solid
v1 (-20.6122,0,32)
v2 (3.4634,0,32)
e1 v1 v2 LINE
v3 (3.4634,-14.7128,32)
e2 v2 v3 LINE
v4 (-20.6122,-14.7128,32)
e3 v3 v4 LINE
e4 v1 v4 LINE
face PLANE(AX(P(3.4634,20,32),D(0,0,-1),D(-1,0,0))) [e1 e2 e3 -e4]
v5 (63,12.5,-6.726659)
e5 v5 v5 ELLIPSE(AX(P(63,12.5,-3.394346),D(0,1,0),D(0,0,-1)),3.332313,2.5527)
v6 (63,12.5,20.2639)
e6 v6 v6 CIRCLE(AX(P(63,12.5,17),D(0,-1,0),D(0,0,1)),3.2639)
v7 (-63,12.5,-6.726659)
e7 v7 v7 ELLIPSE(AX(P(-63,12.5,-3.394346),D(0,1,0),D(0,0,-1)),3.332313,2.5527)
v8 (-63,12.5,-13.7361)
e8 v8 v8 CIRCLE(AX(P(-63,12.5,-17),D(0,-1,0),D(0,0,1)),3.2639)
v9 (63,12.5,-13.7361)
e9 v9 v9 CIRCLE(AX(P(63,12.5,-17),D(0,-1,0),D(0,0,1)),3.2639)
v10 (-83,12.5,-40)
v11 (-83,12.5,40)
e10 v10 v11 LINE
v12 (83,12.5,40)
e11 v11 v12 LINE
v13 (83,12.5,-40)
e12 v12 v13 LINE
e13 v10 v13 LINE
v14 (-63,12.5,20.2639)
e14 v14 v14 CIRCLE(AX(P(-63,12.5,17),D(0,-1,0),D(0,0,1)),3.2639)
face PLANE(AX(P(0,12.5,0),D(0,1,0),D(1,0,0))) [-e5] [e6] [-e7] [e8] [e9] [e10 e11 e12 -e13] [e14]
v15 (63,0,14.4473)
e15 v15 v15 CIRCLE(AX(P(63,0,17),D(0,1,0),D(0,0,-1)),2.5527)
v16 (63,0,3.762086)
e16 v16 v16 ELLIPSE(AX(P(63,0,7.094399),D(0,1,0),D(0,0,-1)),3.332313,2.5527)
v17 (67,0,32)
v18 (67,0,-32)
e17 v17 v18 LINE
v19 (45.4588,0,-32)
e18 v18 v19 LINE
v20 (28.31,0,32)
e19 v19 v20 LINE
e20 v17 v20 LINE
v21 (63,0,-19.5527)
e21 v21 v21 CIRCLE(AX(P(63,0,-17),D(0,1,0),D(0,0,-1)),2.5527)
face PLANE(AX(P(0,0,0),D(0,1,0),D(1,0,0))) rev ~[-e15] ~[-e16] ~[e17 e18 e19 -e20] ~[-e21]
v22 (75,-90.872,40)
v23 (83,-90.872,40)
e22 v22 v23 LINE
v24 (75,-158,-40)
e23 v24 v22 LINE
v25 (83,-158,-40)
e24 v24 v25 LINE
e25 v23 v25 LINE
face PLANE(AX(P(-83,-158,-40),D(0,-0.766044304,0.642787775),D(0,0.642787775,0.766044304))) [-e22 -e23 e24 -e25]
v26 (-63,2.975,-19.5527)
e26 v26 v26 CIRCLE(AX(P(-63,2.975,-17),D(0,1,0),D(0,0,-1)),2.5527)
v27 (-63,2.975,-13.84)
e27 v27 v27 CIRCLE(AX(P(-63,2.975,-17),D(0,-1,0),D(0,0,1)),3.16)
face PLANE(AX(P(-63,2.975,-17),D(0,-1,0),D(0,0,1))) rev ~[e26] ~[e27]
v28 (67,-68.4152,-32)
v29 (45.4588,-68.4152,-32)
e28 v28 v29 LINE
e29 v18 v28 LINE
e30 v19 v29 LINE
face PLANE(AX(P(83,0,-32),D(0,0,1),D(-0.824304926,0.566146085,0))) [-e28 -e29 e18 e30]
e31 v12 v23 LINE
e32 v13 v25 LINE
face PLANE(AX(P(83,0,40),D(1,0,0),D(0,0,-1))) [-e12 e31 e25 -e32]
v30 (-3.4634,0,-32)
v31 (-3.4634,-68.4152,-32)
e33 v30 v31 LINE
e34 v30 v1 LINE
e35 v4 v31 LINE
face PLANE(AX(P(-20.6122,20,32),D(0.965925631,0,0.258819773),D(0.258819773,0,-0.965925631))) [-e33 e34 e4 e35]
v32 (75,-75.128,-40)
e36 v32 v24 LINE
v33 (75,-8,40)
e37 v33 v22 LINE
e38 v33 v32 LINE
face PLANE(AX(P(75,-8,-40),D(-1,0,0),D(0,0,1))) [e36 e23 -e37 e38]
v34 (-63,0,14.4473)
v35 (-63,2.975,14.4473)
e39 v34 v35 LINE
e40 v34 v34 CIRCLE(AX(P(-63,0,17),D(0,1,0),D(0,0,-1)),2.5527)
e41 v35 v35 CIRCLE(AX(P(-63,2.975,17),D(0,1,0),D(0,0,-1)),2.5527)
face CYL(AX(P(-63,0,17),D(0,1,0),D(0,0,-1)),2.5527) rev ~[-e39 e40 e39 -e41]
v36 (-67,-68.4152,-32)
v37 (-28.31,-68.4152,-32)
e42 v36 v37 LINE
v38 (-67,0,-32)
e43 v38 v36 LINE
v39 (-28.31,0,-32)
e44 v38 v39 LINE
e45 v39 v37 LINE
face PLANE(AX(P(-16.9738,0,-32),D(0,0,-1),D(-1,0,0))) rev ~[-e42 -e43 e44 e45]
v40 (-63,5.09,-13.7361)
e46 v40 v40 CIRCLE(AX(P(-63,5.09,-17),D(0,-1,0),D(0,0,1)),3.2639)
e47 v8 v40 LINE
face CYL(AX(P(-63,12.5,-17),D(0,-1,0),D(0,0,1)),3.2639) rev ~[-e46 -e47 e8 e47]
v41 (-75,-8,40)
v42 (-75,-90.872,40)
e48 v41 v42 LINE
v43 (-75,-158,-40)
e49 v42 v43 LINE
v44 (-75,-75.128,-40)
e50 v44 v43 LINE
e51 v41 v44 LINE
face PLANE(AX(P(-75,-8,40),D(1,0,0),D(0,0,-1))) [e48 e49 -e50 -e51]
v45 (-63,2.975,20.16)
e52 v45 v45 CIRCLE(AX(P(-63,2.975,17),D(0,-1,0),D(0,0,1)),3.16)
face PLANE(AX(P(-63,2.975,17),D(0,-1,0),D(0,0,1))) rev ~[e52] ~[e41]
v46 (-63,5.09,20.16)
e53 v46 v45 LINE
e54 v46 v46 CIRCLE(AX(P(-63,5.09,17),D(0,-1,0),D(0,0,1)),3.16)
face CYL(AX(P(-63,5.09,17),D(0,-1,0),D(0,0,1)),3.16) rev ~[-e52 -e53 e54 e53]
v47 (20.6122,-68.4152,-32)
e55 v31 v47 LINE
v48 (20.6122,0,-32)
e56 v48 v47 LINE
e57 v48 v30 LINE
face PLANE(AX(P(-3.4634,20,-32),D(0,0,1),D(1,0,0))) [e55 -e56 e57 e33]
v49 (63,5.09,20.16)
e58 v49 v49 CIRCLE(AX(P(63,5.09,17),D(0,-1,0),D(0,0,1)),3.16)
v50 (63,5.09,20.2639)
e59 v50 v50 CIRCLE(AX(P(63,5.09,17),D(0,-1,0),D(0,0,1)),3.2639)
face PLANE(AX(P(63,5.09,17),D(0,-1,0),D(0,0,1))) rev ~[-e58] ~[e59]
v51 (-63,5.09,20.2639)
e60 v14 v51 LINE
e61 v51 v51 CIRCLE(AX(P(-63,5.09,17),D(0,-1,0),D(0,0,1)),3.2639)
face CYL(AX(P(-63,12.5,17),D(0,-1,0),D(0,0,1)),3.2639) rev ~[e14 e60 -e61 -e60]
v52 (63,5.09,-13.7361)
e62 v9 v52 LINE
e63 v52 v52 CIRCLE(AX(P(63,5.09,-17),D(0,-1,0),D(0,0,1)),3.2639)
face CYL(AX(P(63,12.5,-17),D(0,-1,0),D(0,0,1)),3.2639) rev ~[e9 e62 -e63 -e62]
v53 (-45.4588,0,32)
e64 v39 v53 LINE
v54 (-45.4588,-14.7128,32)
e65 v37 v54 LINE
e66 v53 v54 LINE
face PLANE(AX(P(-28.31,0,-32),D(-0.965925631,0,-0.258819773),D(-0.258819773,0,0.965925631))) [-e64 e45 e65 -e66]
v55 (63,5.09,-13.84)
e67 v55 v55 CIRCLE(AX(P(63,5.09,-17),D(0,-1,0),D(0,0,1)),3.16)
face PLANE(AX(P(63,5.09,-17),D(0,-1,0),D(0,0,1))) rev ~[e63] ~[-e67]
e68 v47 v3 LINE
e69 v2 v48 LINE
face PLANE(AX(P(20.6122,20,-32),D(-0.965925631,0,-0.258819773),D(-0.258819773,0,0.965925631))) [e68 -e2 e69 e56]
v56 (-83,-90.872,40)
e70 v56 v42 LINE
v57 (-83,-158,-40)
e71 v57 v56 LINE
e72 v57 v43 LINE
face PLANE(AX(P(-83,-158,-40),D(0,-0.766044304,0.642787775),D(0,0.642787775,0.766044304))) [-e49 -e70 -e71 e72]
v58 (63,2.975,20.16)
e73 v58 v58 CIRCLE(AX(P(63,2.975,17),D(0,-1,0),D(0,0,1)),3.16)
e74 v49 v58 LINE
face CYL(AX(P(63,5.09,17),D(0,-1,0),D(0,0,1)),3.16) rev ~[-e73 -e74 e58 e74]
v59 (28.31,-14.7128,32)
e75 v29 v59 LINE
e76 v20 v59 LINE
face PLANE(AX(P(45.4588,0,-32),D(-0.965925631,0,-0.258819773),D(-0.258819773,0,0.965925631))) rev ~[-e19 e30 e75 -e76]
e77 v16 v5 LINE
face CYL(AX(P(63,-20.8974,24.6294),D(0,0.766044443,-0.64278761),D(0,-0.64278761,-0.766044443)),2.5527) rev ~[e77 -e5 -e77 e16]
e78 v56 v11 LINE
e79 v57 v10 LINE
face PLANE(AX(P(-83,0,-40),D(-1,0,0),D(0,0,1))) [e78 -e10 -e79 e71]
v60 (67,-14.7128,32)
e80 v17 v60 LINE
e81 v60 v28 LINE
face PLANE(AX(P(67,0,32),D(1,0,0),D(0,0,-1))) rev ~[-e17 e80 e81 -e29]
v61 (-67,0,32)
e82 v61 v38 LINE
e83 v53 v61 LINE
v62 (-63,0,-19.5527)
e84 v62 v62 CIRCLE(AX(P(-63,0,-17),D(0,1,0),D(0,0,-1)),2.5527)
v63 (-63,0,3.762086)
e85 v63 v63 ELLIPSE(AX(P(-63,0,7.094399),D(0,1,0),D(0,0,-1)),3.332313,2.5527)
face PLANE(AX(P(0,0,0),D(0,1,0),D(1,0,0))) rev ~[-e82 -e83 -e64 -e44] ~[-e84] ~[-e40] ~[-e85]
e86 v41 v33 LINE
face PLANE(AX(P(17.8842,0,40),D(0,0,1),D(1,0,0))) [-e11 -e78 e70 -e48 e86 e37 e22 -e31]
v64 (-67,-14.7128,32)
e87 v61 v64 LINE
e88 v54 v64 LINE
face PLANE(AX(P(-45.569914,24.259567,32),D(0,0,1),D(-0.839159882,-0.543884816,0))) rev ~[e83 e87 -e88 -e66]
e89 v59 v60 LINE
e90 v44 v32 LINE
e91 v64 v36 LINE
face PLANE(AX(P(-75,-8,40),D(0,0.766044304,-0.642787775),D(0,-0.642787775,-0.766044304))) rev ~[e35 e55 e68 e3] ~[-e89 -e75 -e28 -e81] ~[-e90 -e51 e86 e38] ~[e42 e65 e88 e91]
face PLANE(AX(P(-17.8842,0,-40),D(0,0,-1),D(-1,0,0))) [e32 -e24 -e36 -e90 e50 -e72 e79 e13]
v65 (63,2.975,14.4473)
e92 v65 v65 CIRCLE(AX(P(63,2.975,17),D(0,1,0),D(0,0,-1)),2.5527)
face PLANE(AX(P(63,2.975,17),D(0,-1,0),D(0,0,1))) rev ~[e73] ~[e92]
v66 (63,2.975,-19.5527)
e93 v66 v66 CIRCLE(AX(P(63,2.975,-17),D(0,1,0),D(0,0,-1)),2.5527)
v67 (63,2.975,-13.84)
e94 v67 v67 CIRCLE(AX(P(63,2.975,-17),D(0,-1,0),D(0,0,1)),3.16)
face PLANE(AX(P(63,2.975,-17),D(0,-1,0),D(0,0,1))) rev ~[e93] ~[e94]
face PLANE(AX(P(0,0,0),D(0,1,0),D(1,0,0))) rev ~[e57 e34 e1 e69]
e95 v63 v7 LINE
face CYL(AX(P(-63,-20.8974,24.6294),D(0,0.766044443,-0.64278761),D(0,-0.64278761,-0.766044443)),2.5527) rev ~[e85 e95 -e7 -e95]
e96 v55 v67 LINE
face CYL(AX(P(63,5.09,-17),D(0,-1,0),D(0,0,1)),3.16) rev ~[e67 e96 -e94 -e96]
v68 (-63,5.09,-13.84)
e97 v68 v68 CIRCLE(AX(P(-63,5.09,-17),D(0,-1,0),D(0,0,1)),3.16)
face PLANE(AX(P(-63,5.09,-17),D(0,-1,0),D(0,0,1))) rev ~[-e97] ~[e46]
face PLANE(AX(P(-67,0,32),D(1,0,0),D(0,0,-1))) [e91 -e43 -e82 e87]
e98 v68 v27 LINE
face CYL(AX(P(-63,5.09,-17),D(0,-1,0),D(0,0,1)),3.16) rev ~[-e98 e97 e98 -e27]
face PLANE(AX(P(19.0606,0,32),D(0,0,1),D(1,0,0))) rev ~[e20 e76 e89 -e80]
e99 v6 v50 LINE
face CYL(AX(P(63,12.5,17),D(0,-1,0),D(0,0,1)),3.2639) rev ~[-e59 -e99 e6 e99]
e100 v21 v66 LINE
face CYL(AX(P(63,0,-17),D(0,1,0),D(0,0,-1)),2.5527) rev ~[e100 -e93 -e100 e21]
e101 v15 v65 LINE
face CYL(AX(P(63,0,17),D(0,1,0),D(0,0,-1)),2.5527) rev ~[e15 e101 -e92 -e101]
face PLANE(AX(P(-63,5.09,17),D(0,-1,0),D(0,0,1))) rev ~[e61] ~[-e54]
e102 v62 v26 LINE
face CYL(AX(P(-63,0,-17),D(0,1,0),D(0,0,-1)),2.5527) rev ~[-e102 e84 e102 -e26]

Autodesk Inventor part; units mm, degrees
ref_plane "XZ Plane" through (0, 0, 0) normal (0, 1, 0) x (-1, 0, 0)
ref_plane "XY Plane" through (0, 0, 0) normal (0, 0, 1) x (1, 0, 0)
sketch "Sketch8" plane through (0, 0, 0) normal (0, 1, 0) x (-1, 0, 0)
  line L0 (83, 40) -> (-83, 40)
  line L1 (-83, 40) -> (-83, -40)
  line L2 (-83, -40) -> (83, -40)
  line L3 (83, -40) -> (83, 40)
  line L4 (83, 40) -> (-83, -40) construction
  line L5 (-83, 40) -> (83, -40) construction
  point P0 (0, 0)
  dimension "d28" = 80
  dimension "d29" = 166
extrude "Extrusion8" add sketch "Sketch8" against normal blind 8
sketch "Sketch9" plane through (0, -8, 0) normal (0, -1, 0) x (1, 0, 0)
  line L0 (83, 40) -> (-83, 40) projected
  line L1 (-83, -40) -> (83, -40) projected
  line L2 (-83, 40) -> (-75, 40)
  line L3 (-75, 40) -> (-75, -40)
  line L4 (-75, -40) -> (-83, -40)
  line L5 (-83, -40) -> (-83, 40)
  line L6 (83, -40) -> (83, 40) projected
  line L7 (83, -40) -> (75, -40)
  line L8 (75, -40) -> (75, 40)
  line L9 (75, 40) -> (83, 40)
  line L10 (83, 40) -> (83, -40)
  point P0 (0, 0)
  point P1 (75, 40)
  point P2 (75, -40)
  dimension "d32" = 8
  dimension "d33" = 8
extrude "armsForCameraCase" add sketch "Sketch9" along normal blind 150 contours L6 L1 L8 L0 | L3 L1 L5 L0
sketch "Sketch10" plane through (-75, -8, 40) normal (1, 0, 0) x (0, 0, -1)
  line L0 (0, 0) -> (80, 0) projected
  line L1 (80, 0) -> (80, -150) projected
  line L2 (80, -150) -> (0, -150) projected
  line L3 (0, 0) -> (0, -150) projected
  line L4 (0, 0) -> (80, -67.128)
  line L5 (80, -67.128) -> (80, 0)
  line L6 (80, 0) -> (0, 0)
  point P0 (40, 8)
  point P1 (40, -33.564)
  dimension "d48" = 40
extrude "Extrusion10" add sketch "Sketch10" along normal up to surface (150 mm away) contours L0 L1 L4
sketch "Sketch11" plane through (0, 0, 0) normal (0, 1, 0) x (1, 0, 0)
  line L0 (83, 40) -> (-83, 40) projected
  line L1 (-83, -40) -> (83, -40) projected
  line L2 (-83, 40) -> (-83, -40) projected
  line L3 (83, -40) -> (83, 40) projected
  line L4 (-31.038, -40) -> (-9.602, 40)
  line L5 (-9.602, 40) -> (-17.8842, 40)
  line L6 (-75, 40) -> (75, 40) projected
  line L7 (-17.8842, 40) -> (-39.3202, -40)
  line L8 (-39.3202, -40) -> (-31.038, -40)
  line L9 (-31.038, -40) -> (-31.038, 40) construction
  line L10 (0, -40) -> (0, 40) construction
  line L11 (9.602, -40) -> (31.038, 40)
  line L12 (31.038, 40) -> (39.3202, 40)
  line L13 (39.3202, 40) -> (17.8842, -40)
  line L14 (17.8842, -40) -> (9.602, -40)
  point P0 (0, 0)
  point P1 (0, -40)
  point P2 (0, -40)
  point P3 (-20.32, 0)
  point P4 (0, 0)
  point P5 (20.32, 0)
  point P6 (39.3202, 40)
  point P7 (31.038, 40)
  point P8 (-17.8842, 40)
  dimension "d39" = -15
  dimension "d40" = 8
  dimension "d42" = 8
  dimension "d44" = 20.32
  dimension "d45" = 20.32
extrude "Extrusion11" add sketch "Sketch11" along normal blind 104.1375 contours L13 L1 L11 L0 | L4 L1 L7 L0
sketch "Sketch12" plane through (0, 0, 0) normal (0, 1, 0) x (1, 0, 0)
  line L0 (31.038, 40) -> (-9.602, 40) projected
  line L1 (31.038, 40) -> (9.602, -40) projected
  line L2 (-31.038, -40) -> (9.602, -40) projected
  line L3 (-31.038, -40) -> (-9.602, 40) projected
  line L4 (-9.602, 40) -> (31.038, 40)
  line L5 (31.038, 40) -> (9.602, -40)
  line L6 (9.602, -40) -> (-31.038, -40)
  line L7 (-9.602, 40) -> (-31.038, -40) projected
  line L8 (-31.038, -40) -> (-9.602, 40)
  point P0 (0, 0)
extrude "Extrusion12" add sketch "Sketch12" along normal blind 20
sketch "Sketch13" plane through (-83, 0, -40) normal (-1, 0, 0) x (0, 0, 1)
  line L0 (0, -75.128) -> (80, -8) projected
  line L1 (80, 0) -> (80, -158) projected
  line L2 (80, -158) -> (0, -158) projected
  line L3 (0, 0) -> (0, -158) projected
  line L4 (80, -158) -> (0, -158) construction
  line L5 (40, -158) -> (40, -41.564) construction
  line L6 (80, -8) -> (0, -75.128) construction
  line L7 (0, -205.6687) -> (80, -138.5407) construction
  line L8 (80, -8) -> (80, -158) construction
  point P0 (40, 0)
  point P1 (40, -172.1047)
  point P2 (20, -188.8867)
  point P3 (60, -155.3227)
  dimension "centerForTwoHoles" = 26.1081
  dimension "d51" = 100
  dimension "diagonalLine" = 104.4326
  dimension "d62" = 26.1081
  dimension "d63" = 26.1081
hole "HolesForAttchingToLowerCase" at (-83, -172.1047, 0) at (-83, -188.8867, -20) at (-83, -155.3227, 20) direction (1, 0, 0) diameter 6.7564 end through all clearance for "Hex Machine Screw" size "1/4" standard "Ansi Unified Screw Threads"
sketch "Sketch14" plane through (-83, 0, -40) normal (-1, 0, 0) x (0, 0, 1)
  line L0 (80, 0) -> (80, -158) projected
  line L1 (80, -158) -> (0, -158) projected
  line L2 (0, 0) -> (0, -158) projected
  line L3 (0, -75.128) -> (80, -8) projected
  line L4 (0, -75.128) -> (0, -158) projected
  line L5 (0, -158) -> (80, -90.872)
  line L6 (0, -158) -> (80, -158) projected
  line L7 (0, -158) -> (80, -158)
  line L8 (80, -158) -> (80, -90.872)
  point P0 (40, 0)
extrude "Extrusion13" cut sketch "Sketch14" against normal through all contours L0 L1 L5
sketch "Sketch15" plane through (-39.3202, 0, 40) normal (-0.9659258, 0, -0.258819) x (-0.258819, 0, 0.9659258)
  line L0 (-82.8221, 104.1375) -> (0, 104.1375) projected
  line L1 (0, 0) -> (0, 104.1375) projected
  line L2 (-82.8221, 0) -> (-82.8221, 104.1375) projected
  line L3 (-2.1436, 20) -> (-84.9657, 20) projected
  line L4 (-82.8221, 40) -> (0, 40) construction
  line L5 (-57.8221, 40) -> (-57.8221, 104.1375) construction
  point P0 (-48.8138, 0)
  point P1 (-82.8221, 52.0688)
  point P2 (-37.8221, 40)
  point P3 (-17.8221, 40)
  point P4 (-57.8221, 60)
  point P5 (-37.8221, 60)
  point P6 (-17.8221, 60)
  point P7 (-57.8221, 80)
  point P8 (-37.8221, 80)
  point P9 (-17.8221, 80)
  dimension "d64" = 25
  dimension "d74" = 20
  dimension "d77" = 20
  dimension "d90" = 20
hole "HoleForLeftSideOf2x4" at (-24.3547, 40, -15.8519) at (-29.5311, 40, 3.4667) at (-34.7075, 40, 22.7852) at (-29.5311, 60, 3.4667) at (-24.3547, 60, -15.8519) at (-34.7075, 60, 22.7852) at (-34.7075, 80, 22.7852) at (-29.5311, 80, 3.4667) at (-24.3547, 80, -15.8519) direction (0.9659258, 0, 0.258819) diameter 4.496 depth 8 countersink diameter 8.433 countersink angle 82 clearance for "Flat Head Machine Screw (82)" size "#8" standard "Ansi Unified Screw Threads"
sketch "Sketch16" plane through (39.3202, 0, -40) normal (0.9659258, 0, 0.258819) x (0.258819, 0, -0.9659258)
  line L0 (-82.8221, 104.1375) -> (0, 104.1375) projected
  line L1 (0, 0) -> (0, 104.1375) projected
  line L2 (-82.8221, 0) -> (-82.8221, 104.1375) projected
  line L3 (-82.8221, 0) -> (-65.9689, 0) projected
  line L4 (-2.1436, 20) -> (-84.9657, 20) projected
  line L5 (-82.8221, 40) -> (0, 40) construction
  line L6 (-67.8221, 40) -> (-67.8221, 104.1375) construction
  point P0 (-48.8138, 0)
  point P1 (-47.8221, 40)
  point P2 (-27.8221, 40)
  point P3 (-67.8221, 60)
  point P4 (-47.8221, 60)
  point P5 (-27.8221, 60)
  point P6 (-67.8221, 80)
  point P7 (-47.8221, 80)
  point P8 (-27.8221, 80)
  dimension "d80" = 20
  dimension "d81" = 15
  dimension "d84" = 20
  dimension "d87" = 20
hole "HolesForRightSideOf2x4" at (26.9429, 40, 6.1926) at (32.1193, 40, -13.1259) at (21.7665, 60, 25.5111) at (26.9429, 60, 6.1926) at (32.1193, 60, -13.1259) at (21.7665, 80, 25.5111) at (26.9429, 80, 6.1926) at (32.1193, 80, -13.1259) at (21.7665, 40, 25.5111) direction (-0.9659258, 0, -0.258819) diameter 4.496 depth 8 countersink diameter 8.433 countersink angle 82 clearance for "Flat Head Machine Screw (82)" size "#8" standard "Ansi Unified Screw Threads"
sketch "Sketch17" plane through (0, 20, 0) normal (0, 1, 0) x (1, 0, 0)
  line L0 (31.038, 40) -> (9.602, -40) projected
  line L1 (-31.038, -40) -> (9.602, -40) projected
  line L2 (-31.038, -40) -> (-9.602, 40) projected
  line L3 (31.038, 40) -> (-9.602, 40) projected
  line L4 (20.6122, 32) -> (3.4634, -32)
  line L5 (3.4634, -32) -> (-20.6122, -32)
  line L6 (-20.6122, -32) -> (-3.4634, 32)
  line L7 (-3.4634, 32) -> (20.6122, 32)
  point P0 (0, 0)
  point P1 (10.718, 40)
  point P2 (-8.5744, -32)
  dimension "d98" = 8
  dimension "d99" = 8
  dimension "d101" = 8
  dimension "d102" = 8
extrude "Extrusion14" cut sketch "Sketch17" against normal through all contours L4 L5 L6 L7
sketch "Sketch18" plane through (0, 0, 0) normal (0, 1, 0) x (1, 0, 0)
  line L0 (17.8842, -40) -> (83, -40) projected
  line L1 (17.8842, -40) -> (39.3202, 40) projected
  line L2 (83, 40) -> (39.3202, 40) projected
  line L3 (83, -40) -> (83, 40) projected
  line L4 (67, -32) -> (67, 32)
  line L5 (67, 32) -> (45.4588, 32)
  line L6 (45.4588, 32) -> (28.31, -32)
  line L7 (28.31, -32) -> (67, -32)
  line L8 (39.3202, 40) -> (17.8842, -40) projected
  line L9 (17.8842, -40) -> (83, -40) projected
  line L10 (83, -40) -> (83, 40) projected
  line L11 (83, 40) -> (39.3202, 40) projected
  point P0 (0, 0)
  dimension "d105" = 8
  dimension "d107" = 8
  dimension "d108" = 16
  dimension "d109" = 8
extrude "Extrusion15" cut sketch "Sketch18" against normal through all contours L7 L6 L5 L4
sketch "Sketch19" plane through (0, 0, 0) normal (0, 1, 0) x (1, 0, 0)
  line L0 (-17.8842, 40) -> (-39.3202, -40) projected
  line L1 (-83, -40) -> (-39.3202, -40) projected
  line L2 (-83, 40) -> (-83, -40) projected
  line L3 (-17.8842, 40) -> (-83, 40) projected
  line L4 (-28.31, 32) -> (-45.4588, -32)
  line L5 (-45.4588, -32) -> (-67, -32)
  line L6 (-67, -32) -> (-67, 32)
  line L7 (-67, 32) -> (-28.31, 32)
  point P0 (0, 0)
  point P1 (-61.1601, -40)
  dimension "d112" = 8
  dimension "d113" = 16
  dimension "d114" = 8
  dimension "d115" = 8
extrude "Extrusion16" cut sketch "Sketch19" against normal through all contours L4 L5 L6 L7
sketch "Sketch27" plane through (-75, -8, 40) normal (0, 0, 1) x (1, 0, 0)
  line L0 (92.8842, 8) -> (158, 8) projected
  line L1 (92.8842, 8) -> (92.8842, 112.1375) projected
  line L2 (158, 8) -> (158, -82.872) projected
  line L3 (92.8842, 38) -> (158, 8)
  line L4 (158, 8) -> (92.8842, 8)
  line L5 (92.8842, 8) -> (92.8842, 38)
  point P0 (75, 8)
  dimension "d152" = 30
sketch "Sketch28" plane through (67, 0, 32) normal (0, 0, -1) x (-1, 0, 0)
  line L0 (-16, 0) -> (47.9394, 0)
  line L1 (49.1158, 0) -> (49.1158, 104.1375) projected
  line L2 (47.9394, 0) -> (47.9394, 30)
  line L3 (47.9394, 30) -> (-16, 0)
  point P0 (67, 0)
  dimension "d153" = 30
loft "Loft5" add profiles "Sketch27", "Sketch28"
sketch "Sketch29" plane through (75, -75.128, -40) normal (0, 0, -1) x (-1, 0, 0)
  line L0 (-8, 75.128) -> (35.6798, 75.128) projected
  line L1 (35.6798, 75.128) -> (35.6798, 179.2655) projected
  line L2 (-8, 75.128) -> (-8, -15.7441) projected
  line L3 (-8, 75.128) -> (35.6798, 75.128)
  line L4 (35.6798, 75.128) -> (35.6798, 105.128)
  line L5 (35.6798, 105.128) -> (-8, 75.128)
  point P0 (75, 75.128)
  dimension "d158" = 30
sketch "Sketch30" plane through (45.4588, 0, -32) normal (0, 0, 1) x (1, 0, 0)
  line L0 (-6.1386, 0) -> (-6.1386, 104.1375) projected
  line L1 (37.5412, 0) -> (-6.1386, 0) projected
  line L2 (-6.1386, 0) -> (-6.1386, 104.1375) projected
  line L3 (-6.1386, 0) -> (37.5412, 0)
  line L4 (37.5412, 0) -> (-6.1386, 30)
  line L5 (-6.1386, 30) -> (-6.1386, 0)
  point P0 (-45.4588, 0)
  dimension "d159" = 30
loft "Loft6" add profiles "Sketch29", "Sketch30"
sketch "Sketch31" plane through (-75, -8, 40) normal (0, 0, 1) x (1, 0, 0)
  line L0 (-8, 8) -> (35.6798, 8) projected
  line L1 (35.6798, 8) -> (35.6798, 112.1375) projected
  line L2 (57.1158, 8) -> (-8, 8) projected
  line L3 (-8, 8) -> (35.6798, 8)
  line L4 (35.6798, 8) -> (35.6798, 47)
  line L5 (35.6798, 47) -> (-8, 8)
  point P0 (75, 8)
  dimension "d164" = 39
sketch "Sketch32" plane through (-45.4588, 0, 32) normal (0, 0, -1) x (-1, 0, 0)
  line L0 (37.5412, 0) -> (-6.1386, 0) projected
  line L1 (37.5412, 0) -> (-8.7458, 0)
  line L2 (-8.7458, 0) -> (-8.7458, 30)
  line L3 (-8.7458, 30) -> (37.5412, 0)
  point P0 (-45.4588, 0)
  dimension "d165" = 30
loft "Loft7" add profiles "Sketch31", "Sketch32"
sketch "Sketch33" plane through (75, -75.128, -40) normal (0, 0, -1) x (-1, 0, 0)
  line L0 (92.8842, 75.128) -> (158, 75.128) projected
  line L1 (92.8842, 75.128) -> (92.8842, 179.2655) projected
  line L2 (112.1766, 75.128) -> (92.8842, 75.128) projected
  line L3 (92.8842, 75.128) -> (158, 75.128)
  line L4 (158, 75.128) -> (92.8842, 105.128)
  line L5 (92.8842, 105.128) -> (92.8842, 75.128)
  point P0 (75, 75.128)
  dimension "d171" = 30
sketch "Sketch34" plane through (-67, 0, -32) normal (0, 0, 1) x (1, 0, 0)
  line L0 (49.1158, 0) -> (-16, 0) projected
  line L1 (49.1158, 0) -> (49.1158, 104.1375) projected
  line L2 (-16, 0) -> (50.0262, 0)
  line L3 (29.8234, 0) -> (49.1158, 0) projected
  line L4 (50.0262, 0) -> (50.0262, 30)
  line L5 (50.0262, 30) -> (-16, 0)
  point P0 (67, 0)
  dimension "d170" = 30
loft "Loft8" add profiles "Sketch33", "Sketch34"
split "Split3" plane through (0, 0, 0) removes the side toward (0, 1, 0)
sketch "Sketch37" plane through (0, 0, 0) normal (0, 1, 0) x (1, 0, 0)
  line L0 (-83, 40) -> (83, 40) projected
  line L1 (83, -40) -> (83, 40) projected
  line L2 (83, -40) -> (-83, -40) projected
  line L3 (-83, 40) -> (-83, -40) projected
  line L4 (-82, -40) -> (82, -40)
  line L5 (82, -40) -> (82, 40)
  line L6 (82, 40) -> (-82, 40)
  line L7 (-82, 40) -> (-82, -40)
  line L8 (-82, -40) -> (82, 40) construction
  line L9 (82, -40) -> (-82, 40) construction
  point P0 (0, 0)
extrude "ExtrusionForMatingUpperHalf" add sketch "Sketch37" along normal blind 12.5
sketch "Sketch38" plane through (0, 0, 0) normal (0, -1, 0) x (1, 0, 0)
  point P0 (-63, -17)
  point P1 (63, -17)
  point P2 (63, 17)
  point P3 (-63, 17)
hole "HoleForNumber10Screws" at (-63, 0, -17) at (63, 0, -17) at (63, 0, 17) at (-63, 0, 17) direction (0, 1, 0) diameter 5.1054 end through all
sketch "SketchForHeatSetInserts" plane through (0, 12.5, 0) normal (0, 1, 0) x (1, 0, 0)
  circle A0 centre (-63, 17) radius 2.5527 construction
  circle A1 centre (63, -17) radius 2.5527 construction
  line L0 (-63, 17) -> (63, 17) construction
  line L1 (63, 17) -> (63, -17) construction
  line L2 (63, -17) -> (-63, -17) construction
  line L3 (-63, -17) -> (-63, 17) construction
  circle A2 centre (63, 17) radius 2.5527 projected
  point P0 (0, 0)
hole "HoleForInserts" at (-63, 12.5, -17) at (63, 12.5, -17) at (63, 12.5, 17) at (-63, 12.5, 17) direction (0, -1, 0) diameter 6.32 depth 9.525 counterbore diameter 6.5278 counterbore depth 7.41
sketch "Sketch42" plane through (-75, -8, 40) normal (0, -0.7660444, 0.6427876) x (1, 0, 0)
  line L0 (-8, 13.1771) -> (158, 13.1771) projected
  line L1 (0, -104.4326) -> (150, -104.4326) projected
  ellipse E0 centre (138, -12.4767) end of major axis (140.5527, -12.4767) minor radius 1.9555 projected
  ellipse E1 centre (138, -38.5222) end of major axis (140.5527, -38.5222) minor radius 1.9555 projected
  ellipse E2 centre (12, -12.4767) end of major axis (14.5527, -12.4767) minor radius 1.9555 projected
  ellipse E3 centre (12, -38.5222) end of major axis (14.5527, -38.5222) minor radius 1.9555 projected
  line L2 (138, 13.1771) -> (138, -104.4326) construction
  line L3 (12, 13.1771) -> (12, -104.4326) construction
  point P0 (75, -25.4995)
  point P1 (138, -20.0649)
  point P2 (12, -20.0649)
  dimension "d210" = 33.242
  dimension "d211" = 33.242
hole "Hole8" at (63, -20.8974, 24.6294) at (-63, -20.8974, 24.6294) direction (0, 0.7660444, -0.6427876) diameter 5.1054 depth 50 clearance for "Hex Machine Screw" size "#10" standard "Ansi Unified Screw Threads"
equation "\"d28\" = widthOfBracket"
equation "\"d30\" = wallThickness"
equation "\"d32\" = wallThickness"
equation "\"d33\" = wallThickness"
equation "\"d48\" = elevation"
equation "\"d39\" = azimuth"
equation "\"d40\" = wallThickness"
equation "\"d42\" = wallThickness"
equation "\"d44\" = 0.5 * twoByFourWidth"
equation "\"d45\" = 0.5 * twoByFourWidth"
equation "\"d46\" = twoByFourDepth + baseBelowTwoByFour"
equation "\"d49\" = baseBelowTwoByFour"
equation "\"centerForTwoHoles\" = 0.25 * diagonalLine"
equation "\"d62\" = centerForTwoHoles"
equation "\"d63\" = centerForTwoHoles"
equation "\"d98\" = wallThickness"
equation "\"d99\" = wallThickness"
equation "\"d101\" = wallThickness"
equation "\"d102\" = wallThickness"
equation "\"d105\" = wallThickness"
equation "\"d107\" = wallThickness"
equation "\"d108\" = 2 * wallThickness"
equation "\"d109\" = wallThickness"
equation "\"d112\" = wallThickness"
equation "\"d113\" = 2 * wallThickness"
equation "\"d114\" = wallThickness"
equation "\"d115\" = wallThickness"
equation "\"d185\" = depthOfExtrusionForMatingUpperHalf"
equation "\"wallThickness\" = 8"
equation "\"widthOfBracket\" = 80"
equation "\"twoByFourWidth\" = 40.64"
equation "\"twoByFourDepth\" = 84.1375"
equation "\"azimuth\" = -15deg"
equation "\"elevation\" = 40deg"
equation "\"baseBelowTwoByFour\" = 20"
equation "\"depthOfExtrusionForMatingUpperHalf\" = 12.5"
equation "\"topWallThickness\" = 12.7"
properties part number "bracketForGarageLowerHalf" material "PC/ABS Plastic"
